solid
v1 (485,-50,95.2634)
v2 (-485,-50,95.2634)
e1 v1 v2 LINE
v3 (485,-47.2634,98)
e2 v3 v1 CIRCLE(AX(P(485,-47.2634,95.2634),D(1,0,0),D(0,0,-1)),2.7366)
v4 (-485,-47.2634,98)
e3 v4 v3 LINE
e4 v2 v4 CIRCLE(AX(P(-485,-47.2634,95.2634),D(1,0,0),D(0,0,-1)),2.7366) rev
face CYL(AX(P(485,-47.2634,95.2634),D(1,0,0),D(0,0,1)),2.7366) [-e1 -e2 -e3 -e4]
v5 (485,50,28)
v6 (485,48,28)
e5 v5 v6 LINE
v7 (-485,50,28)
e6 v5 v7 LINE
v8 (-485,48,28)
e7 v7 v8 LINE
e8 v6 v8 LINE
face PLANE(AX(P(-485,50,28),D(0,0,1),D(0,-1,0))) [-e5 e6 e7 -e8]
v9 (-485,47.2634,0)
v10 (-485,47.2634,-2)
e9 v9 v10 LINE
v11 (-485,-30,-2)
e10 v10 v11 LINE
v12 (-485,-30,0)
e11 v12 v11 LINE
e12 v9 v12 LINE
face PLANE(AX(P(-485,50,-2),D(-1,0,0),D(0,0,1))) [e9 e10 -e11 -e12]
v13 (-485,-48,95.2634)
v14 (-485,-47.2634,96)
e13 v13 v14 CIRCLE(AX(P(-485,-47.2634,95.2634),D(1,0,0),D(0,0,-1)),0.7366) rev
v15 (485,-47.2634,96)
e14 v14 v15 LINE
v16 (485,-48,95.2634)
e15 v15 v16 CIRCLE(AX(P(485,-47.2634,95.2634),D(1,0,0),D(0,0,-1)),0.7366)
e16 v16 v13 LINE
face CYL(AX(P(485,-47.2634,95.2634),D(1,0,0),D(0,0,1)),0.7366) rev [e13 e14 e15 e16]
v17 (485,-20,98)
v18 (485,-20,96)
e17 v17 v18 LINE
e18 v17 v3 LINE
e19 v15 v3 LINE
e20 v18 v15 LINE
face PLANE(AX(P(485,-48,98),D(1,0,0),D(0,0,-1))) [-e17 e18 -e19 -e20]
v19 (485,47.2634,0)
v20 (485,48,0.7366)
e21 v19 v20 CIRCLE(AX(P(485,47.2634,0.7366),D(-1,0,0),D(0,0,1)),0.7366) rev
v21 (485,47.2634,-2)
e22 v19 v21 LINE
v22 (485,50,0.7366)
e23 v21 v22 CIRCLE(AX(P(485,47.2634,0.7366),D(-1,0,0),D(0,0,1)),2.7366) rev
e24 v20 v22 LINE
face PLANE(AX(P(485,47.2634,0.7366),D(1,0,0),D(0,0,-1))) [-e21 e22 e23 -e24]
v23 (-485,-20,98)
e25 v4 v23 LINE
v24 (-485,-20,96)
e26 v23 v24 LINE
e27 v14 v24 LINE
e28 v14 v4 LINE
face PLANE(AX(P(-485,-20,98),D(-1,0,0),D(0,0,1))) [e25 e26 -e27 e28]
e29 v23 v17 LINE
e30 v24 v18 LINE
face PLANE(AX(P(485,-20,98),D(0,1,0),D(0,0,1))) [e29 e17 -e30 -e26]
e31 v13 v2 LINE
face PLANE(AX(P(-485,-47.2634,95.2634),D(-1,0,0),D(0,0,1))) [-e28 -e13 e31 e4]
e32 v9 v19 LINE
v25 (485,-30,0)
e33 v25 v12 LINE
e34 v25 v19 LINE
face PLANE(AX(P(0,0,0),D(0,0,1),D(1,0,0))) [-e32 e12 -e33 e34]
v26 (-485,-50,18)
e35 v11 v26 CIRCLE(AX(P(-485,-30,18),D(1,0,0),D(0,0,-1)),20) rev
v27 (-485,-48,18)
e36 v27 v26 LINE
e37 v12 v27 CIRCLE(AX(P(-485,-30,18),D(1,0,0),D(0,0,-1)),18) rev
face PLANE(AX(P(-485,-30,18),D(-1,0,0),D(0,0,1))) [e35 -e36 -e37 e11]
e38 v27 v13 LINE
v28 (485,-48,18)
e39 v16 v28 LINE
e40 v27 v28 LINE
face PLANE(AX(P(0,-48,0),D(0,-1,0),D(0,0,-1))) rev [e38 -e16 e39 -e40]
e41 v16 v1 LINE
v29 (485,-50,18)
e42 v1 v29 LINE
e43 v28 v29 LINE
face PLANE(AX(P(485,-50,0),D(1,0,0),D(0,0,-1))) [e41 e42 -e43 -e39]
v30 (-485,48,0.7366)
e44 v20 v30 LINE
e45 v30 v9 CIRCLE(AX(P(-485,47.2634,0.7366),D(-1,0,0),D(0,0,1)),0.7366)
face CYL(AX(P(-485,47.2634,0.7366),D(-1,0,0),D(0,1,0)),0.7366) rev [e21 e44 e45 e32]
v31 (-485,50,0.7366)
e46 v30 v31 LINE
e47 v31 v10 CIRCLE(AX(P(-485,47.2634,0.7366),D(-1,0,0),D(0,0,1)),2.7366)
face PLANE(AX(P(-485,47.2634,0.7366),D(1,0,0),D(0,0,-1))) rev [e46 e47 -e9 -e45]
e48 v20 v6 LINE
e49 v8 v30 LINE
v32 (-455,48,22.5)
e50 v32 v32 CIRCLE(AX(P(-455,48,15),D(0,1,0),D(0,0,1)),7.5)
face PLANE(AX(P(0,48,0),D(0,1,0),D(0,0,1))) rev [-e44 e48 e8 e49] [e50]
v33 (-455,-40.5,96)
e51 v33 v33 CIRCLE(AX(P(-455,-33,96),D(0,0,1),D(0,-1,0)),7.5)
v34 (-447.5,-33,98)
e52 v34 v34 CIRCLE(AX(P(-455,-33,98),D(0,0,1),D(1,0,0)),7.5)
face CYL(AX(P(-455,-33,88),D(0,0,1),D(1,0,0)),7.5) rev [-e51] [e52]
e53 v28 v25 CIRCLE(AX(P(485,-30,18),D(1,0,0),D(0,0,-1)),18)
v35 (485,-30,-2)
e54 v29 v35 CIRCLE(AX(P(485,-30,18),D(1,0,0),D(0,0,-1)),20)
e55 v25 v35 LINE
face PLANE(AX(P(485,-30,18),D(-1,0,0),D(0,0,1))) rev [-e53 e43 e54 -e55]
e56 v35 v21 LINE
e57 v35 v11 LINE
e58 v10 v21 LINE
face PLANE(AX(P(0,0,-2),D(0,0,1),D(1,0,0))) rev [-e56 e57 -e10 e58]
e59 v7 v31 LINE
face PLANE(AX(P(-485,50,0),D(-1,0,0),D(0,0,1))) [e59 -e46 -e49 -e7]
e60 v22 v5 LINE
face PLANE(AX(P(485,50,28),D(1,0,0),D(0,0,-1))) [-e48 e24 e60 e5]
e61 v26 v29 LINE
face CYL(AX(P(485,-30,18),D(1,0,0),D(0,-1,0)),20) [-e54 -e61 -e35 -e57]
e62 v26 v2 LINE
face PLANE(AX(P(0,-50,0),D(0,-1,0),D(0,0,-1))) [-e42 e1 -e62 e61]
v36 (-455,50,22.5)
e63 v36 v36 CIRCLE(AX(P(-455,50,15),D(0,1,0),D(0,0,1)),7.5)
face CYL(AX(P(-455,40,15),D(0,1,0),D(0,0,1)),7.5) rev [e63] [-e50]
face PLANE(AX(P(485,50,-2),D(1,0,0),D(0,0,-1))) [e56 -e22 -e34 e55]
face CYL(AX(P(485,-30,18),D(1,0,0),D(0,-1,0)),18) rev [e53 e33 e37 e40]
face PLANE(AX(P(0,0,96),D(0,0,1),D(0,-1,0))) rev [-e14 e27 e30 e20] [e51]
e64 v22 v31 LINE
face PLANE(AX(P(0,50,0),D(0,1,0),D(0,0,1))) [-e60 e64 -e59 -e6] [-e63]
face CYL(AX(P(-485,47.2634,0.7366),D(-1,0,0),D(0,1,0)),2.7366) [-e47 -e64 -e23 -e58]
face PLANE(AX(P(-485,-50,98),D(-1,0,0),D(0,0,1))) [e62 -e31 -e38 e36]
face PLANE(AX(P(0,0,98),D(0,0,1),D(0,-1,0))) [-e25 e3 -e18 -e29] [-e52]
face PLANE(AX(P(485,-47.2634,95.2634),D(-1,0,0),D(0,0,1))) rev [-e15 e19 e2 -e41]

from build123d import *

# Parameters (mm, degrees)
SKETCH_2_W                       = 970
SKETCH_2_H                       = 100
SM_BASE_FLANGE_1_DEPTH           = 2
SM_EDGE_FLANGE_1_STRIP_W         = 44
SM_EDGE_FLANGE_1_STRIP_H         = 2
SM_EDGE_FLANGE_1_STRIP_CUT_DEPTH = 970
SM_EDGE_FLANGE_1_DEPTH           = 970
SM_EDGE_FLANGE_2_STRIP_W         = 9.4732
SM_EDGE_FLANGE_2_STRIP_H         = 2
SM_EDGE_FLANGE_2_STRIP_CUT_DEPTH = 970
SM_EDGE_FLANGE_2_DEPTH           = 970
SM_EDGE_FLANGE_3_STRIP_W         = 9.4732
SM_EDGE_FLANGE_3_STRIP_H         = 2
SM_EDGE_FLANGE_3_STRIP_CUT_DEPTH = 970
SM_EDGE_FLANGE_3_DEPTH           = 970
SKETCH_16_R                      = 7.5
CUT_EXTRUDE_1_DEPTH              = 10
SKETCH_17_R                      = 7.5
CUT_EXTRUDE_2_DEPTH              = 10


# Sheet-metal steps are written as plain solids
with BuildPart() as part:
    # Sketch 2 → 基体-法兰1 (new body)
    with BuildSketch(Plane.XY):
        Rectangle(SKETCH_2_W, SKETCH_2_H)
    extrude(amount=-SM_BASE_FLANGE_1_DEPTH)

    # 边线-法兰1 strip (across the edge) → 边线-法兰1 strip cut (cut)
    with BuildSketch(Plane(origin=(-485, -50, 0), x_dir=(0, 1, 0), z_dir=(1, 0, 0))):
        with Locations((-2, -1)):
            Rectangle(SM_EDGE_FLANGE_1_STRIP_W, SM_EDGE_FLANGE_1_STRIP_H)
    extrude(amount=SM_EDGE_FLANGE_1_STRIP_CUT_DEPTH, mode=Mode.SUBTRACT)

    # 边线-法兰1 section (across the edge) → 边线-法兰1 (add)
    with BuildSketch(Plane(origin=(-485, -50, 0), x_dir=(0, 1, 0), z_dir=(1, 0, 0))):
        with BuildLine():
            Line((0, 18), (0, 98))
            Line((0, 98), (2, 98))
            Line((2, 98), (2, 18))
            ThreePointArc((2, 18), (7.272077939, 5.272077939), (20, 0))
            Line((20, 0), (20, -2))
            ThreePointArc((20, -2), (5.857864376, 3.857864376), (0, 18))
        make_face()
    extrude(amount=SM_EDGE_FLANGE_1_DEPTH)

    # 边线-法兰2 strip (across the edge) → 边线-法兰2 strip cut (cut)
    with BuildSketch(Plane(origin=(485, 50, 0), x_dir=(0, -1, 0), z_dir=(-1, 0, 0))):
        with Locations((-2, -1)):
            Rectangle(SM_EDGE_FLANGE_2_STRIP_W, SM_EDGE_FLANGE_2_STRIP_H)
    extrude(amount=SM_EDGE_FLANGE_2_STRIP_CUT_DEPTH, mode=Mode.SUBTRACT)

    # 边线-法兰2 section (across the edge) → 边线-法兰2 (add)
    with BuildSketch(Plane(origin=(485, 50, 0), x_dir=(0, -1, 0), z_dir=(-1, 0, 0))):
        with BuildLine():
            Line((0, 0.7366), (0, 28))
            Line((0, 28), (2, 28))
            Line((2, 28), (2, 0.7366))
            ThreePointArc((2, 0.7366), (2.215745145, 0.215745145), (2.7366, 0))
            Line((2.7366, 0), (2.7366, -2))
            ThreePointArc((2.7366, -2), (0.801531583, -1.198468417), (0, 0.7366))
        make_face()
    extrude(amount=SM_EDGE_FLANGE_2_DEPTH)

    # 边线-法兰3 strip (across the edge) → 边线-法兰3 strip cut (cut)
    with BuildSketch(Plane(origin=(-485, -48, 98), x_dir=(0, 0, -1), z_dir=(1, 0, 0))):
        with Locations((-2, -1)):
            Rectangle(SM_EDGE_FLANGE_3_STRIP_W, SM_EDGE_FLANGE_3_STRIP_H)
    extrude(amount=SM_EDGE_FLANGE_3_STRIP_CUT_DEPTH, mode=Mode.SUBTRACT)

    # 边线-法兰3 section (across the edge) → 边线-法兰3 (add)
    with BuildSketch(Plane(origin=(-485, -48, 98), x_dir=(0, 0, -1), z_dir=(1, 0, 0))):
        with BuildLine():
            Line((0, 0.7366), (0, 28))
            Line((0, 28), (2, 28))
            Line((2, 28), (2, 0.7366))
            ThreePointArc((2, 0.7366), (2.215745145, 0.215745145), (2.7366, 0))
            Line((2.7366, 0), (2.7366, -2))
            ThreePointArc((2.7366, -2), (0.801531583, -1.198468417), (0, 0.7366))
        make_face()
    extrude(amount=SM_EDGE_FLANGE_3_DEPTH)

    # 草图16 → 切除-拉伸1 (cut)
    with BuildSketch(Plane(origin=(0, 50, 0), x_dir=(1, 0, 0), z_dir=(0, 1, 0))):
        with Locations(Location((-455, -15, 0), (0, 0, 270))):
            Circle(SKETCH_16_R)
    extrude(amount=-CUT_EXTRUDE_1_DEPTH, mode=Mode.SUBTRACT)

    # 草图17 → 切除-拉伸2 (cut)
    with BuildSketch(Plane.XY.offset(98)):
        with Locations((-455, -33)):
            Circle(SKETCH_17_R)
    extrude(amount=-CUT_EXTRUDE_2_DEPTH, mode=Mode.SUBTRACT)


solid = part.part
